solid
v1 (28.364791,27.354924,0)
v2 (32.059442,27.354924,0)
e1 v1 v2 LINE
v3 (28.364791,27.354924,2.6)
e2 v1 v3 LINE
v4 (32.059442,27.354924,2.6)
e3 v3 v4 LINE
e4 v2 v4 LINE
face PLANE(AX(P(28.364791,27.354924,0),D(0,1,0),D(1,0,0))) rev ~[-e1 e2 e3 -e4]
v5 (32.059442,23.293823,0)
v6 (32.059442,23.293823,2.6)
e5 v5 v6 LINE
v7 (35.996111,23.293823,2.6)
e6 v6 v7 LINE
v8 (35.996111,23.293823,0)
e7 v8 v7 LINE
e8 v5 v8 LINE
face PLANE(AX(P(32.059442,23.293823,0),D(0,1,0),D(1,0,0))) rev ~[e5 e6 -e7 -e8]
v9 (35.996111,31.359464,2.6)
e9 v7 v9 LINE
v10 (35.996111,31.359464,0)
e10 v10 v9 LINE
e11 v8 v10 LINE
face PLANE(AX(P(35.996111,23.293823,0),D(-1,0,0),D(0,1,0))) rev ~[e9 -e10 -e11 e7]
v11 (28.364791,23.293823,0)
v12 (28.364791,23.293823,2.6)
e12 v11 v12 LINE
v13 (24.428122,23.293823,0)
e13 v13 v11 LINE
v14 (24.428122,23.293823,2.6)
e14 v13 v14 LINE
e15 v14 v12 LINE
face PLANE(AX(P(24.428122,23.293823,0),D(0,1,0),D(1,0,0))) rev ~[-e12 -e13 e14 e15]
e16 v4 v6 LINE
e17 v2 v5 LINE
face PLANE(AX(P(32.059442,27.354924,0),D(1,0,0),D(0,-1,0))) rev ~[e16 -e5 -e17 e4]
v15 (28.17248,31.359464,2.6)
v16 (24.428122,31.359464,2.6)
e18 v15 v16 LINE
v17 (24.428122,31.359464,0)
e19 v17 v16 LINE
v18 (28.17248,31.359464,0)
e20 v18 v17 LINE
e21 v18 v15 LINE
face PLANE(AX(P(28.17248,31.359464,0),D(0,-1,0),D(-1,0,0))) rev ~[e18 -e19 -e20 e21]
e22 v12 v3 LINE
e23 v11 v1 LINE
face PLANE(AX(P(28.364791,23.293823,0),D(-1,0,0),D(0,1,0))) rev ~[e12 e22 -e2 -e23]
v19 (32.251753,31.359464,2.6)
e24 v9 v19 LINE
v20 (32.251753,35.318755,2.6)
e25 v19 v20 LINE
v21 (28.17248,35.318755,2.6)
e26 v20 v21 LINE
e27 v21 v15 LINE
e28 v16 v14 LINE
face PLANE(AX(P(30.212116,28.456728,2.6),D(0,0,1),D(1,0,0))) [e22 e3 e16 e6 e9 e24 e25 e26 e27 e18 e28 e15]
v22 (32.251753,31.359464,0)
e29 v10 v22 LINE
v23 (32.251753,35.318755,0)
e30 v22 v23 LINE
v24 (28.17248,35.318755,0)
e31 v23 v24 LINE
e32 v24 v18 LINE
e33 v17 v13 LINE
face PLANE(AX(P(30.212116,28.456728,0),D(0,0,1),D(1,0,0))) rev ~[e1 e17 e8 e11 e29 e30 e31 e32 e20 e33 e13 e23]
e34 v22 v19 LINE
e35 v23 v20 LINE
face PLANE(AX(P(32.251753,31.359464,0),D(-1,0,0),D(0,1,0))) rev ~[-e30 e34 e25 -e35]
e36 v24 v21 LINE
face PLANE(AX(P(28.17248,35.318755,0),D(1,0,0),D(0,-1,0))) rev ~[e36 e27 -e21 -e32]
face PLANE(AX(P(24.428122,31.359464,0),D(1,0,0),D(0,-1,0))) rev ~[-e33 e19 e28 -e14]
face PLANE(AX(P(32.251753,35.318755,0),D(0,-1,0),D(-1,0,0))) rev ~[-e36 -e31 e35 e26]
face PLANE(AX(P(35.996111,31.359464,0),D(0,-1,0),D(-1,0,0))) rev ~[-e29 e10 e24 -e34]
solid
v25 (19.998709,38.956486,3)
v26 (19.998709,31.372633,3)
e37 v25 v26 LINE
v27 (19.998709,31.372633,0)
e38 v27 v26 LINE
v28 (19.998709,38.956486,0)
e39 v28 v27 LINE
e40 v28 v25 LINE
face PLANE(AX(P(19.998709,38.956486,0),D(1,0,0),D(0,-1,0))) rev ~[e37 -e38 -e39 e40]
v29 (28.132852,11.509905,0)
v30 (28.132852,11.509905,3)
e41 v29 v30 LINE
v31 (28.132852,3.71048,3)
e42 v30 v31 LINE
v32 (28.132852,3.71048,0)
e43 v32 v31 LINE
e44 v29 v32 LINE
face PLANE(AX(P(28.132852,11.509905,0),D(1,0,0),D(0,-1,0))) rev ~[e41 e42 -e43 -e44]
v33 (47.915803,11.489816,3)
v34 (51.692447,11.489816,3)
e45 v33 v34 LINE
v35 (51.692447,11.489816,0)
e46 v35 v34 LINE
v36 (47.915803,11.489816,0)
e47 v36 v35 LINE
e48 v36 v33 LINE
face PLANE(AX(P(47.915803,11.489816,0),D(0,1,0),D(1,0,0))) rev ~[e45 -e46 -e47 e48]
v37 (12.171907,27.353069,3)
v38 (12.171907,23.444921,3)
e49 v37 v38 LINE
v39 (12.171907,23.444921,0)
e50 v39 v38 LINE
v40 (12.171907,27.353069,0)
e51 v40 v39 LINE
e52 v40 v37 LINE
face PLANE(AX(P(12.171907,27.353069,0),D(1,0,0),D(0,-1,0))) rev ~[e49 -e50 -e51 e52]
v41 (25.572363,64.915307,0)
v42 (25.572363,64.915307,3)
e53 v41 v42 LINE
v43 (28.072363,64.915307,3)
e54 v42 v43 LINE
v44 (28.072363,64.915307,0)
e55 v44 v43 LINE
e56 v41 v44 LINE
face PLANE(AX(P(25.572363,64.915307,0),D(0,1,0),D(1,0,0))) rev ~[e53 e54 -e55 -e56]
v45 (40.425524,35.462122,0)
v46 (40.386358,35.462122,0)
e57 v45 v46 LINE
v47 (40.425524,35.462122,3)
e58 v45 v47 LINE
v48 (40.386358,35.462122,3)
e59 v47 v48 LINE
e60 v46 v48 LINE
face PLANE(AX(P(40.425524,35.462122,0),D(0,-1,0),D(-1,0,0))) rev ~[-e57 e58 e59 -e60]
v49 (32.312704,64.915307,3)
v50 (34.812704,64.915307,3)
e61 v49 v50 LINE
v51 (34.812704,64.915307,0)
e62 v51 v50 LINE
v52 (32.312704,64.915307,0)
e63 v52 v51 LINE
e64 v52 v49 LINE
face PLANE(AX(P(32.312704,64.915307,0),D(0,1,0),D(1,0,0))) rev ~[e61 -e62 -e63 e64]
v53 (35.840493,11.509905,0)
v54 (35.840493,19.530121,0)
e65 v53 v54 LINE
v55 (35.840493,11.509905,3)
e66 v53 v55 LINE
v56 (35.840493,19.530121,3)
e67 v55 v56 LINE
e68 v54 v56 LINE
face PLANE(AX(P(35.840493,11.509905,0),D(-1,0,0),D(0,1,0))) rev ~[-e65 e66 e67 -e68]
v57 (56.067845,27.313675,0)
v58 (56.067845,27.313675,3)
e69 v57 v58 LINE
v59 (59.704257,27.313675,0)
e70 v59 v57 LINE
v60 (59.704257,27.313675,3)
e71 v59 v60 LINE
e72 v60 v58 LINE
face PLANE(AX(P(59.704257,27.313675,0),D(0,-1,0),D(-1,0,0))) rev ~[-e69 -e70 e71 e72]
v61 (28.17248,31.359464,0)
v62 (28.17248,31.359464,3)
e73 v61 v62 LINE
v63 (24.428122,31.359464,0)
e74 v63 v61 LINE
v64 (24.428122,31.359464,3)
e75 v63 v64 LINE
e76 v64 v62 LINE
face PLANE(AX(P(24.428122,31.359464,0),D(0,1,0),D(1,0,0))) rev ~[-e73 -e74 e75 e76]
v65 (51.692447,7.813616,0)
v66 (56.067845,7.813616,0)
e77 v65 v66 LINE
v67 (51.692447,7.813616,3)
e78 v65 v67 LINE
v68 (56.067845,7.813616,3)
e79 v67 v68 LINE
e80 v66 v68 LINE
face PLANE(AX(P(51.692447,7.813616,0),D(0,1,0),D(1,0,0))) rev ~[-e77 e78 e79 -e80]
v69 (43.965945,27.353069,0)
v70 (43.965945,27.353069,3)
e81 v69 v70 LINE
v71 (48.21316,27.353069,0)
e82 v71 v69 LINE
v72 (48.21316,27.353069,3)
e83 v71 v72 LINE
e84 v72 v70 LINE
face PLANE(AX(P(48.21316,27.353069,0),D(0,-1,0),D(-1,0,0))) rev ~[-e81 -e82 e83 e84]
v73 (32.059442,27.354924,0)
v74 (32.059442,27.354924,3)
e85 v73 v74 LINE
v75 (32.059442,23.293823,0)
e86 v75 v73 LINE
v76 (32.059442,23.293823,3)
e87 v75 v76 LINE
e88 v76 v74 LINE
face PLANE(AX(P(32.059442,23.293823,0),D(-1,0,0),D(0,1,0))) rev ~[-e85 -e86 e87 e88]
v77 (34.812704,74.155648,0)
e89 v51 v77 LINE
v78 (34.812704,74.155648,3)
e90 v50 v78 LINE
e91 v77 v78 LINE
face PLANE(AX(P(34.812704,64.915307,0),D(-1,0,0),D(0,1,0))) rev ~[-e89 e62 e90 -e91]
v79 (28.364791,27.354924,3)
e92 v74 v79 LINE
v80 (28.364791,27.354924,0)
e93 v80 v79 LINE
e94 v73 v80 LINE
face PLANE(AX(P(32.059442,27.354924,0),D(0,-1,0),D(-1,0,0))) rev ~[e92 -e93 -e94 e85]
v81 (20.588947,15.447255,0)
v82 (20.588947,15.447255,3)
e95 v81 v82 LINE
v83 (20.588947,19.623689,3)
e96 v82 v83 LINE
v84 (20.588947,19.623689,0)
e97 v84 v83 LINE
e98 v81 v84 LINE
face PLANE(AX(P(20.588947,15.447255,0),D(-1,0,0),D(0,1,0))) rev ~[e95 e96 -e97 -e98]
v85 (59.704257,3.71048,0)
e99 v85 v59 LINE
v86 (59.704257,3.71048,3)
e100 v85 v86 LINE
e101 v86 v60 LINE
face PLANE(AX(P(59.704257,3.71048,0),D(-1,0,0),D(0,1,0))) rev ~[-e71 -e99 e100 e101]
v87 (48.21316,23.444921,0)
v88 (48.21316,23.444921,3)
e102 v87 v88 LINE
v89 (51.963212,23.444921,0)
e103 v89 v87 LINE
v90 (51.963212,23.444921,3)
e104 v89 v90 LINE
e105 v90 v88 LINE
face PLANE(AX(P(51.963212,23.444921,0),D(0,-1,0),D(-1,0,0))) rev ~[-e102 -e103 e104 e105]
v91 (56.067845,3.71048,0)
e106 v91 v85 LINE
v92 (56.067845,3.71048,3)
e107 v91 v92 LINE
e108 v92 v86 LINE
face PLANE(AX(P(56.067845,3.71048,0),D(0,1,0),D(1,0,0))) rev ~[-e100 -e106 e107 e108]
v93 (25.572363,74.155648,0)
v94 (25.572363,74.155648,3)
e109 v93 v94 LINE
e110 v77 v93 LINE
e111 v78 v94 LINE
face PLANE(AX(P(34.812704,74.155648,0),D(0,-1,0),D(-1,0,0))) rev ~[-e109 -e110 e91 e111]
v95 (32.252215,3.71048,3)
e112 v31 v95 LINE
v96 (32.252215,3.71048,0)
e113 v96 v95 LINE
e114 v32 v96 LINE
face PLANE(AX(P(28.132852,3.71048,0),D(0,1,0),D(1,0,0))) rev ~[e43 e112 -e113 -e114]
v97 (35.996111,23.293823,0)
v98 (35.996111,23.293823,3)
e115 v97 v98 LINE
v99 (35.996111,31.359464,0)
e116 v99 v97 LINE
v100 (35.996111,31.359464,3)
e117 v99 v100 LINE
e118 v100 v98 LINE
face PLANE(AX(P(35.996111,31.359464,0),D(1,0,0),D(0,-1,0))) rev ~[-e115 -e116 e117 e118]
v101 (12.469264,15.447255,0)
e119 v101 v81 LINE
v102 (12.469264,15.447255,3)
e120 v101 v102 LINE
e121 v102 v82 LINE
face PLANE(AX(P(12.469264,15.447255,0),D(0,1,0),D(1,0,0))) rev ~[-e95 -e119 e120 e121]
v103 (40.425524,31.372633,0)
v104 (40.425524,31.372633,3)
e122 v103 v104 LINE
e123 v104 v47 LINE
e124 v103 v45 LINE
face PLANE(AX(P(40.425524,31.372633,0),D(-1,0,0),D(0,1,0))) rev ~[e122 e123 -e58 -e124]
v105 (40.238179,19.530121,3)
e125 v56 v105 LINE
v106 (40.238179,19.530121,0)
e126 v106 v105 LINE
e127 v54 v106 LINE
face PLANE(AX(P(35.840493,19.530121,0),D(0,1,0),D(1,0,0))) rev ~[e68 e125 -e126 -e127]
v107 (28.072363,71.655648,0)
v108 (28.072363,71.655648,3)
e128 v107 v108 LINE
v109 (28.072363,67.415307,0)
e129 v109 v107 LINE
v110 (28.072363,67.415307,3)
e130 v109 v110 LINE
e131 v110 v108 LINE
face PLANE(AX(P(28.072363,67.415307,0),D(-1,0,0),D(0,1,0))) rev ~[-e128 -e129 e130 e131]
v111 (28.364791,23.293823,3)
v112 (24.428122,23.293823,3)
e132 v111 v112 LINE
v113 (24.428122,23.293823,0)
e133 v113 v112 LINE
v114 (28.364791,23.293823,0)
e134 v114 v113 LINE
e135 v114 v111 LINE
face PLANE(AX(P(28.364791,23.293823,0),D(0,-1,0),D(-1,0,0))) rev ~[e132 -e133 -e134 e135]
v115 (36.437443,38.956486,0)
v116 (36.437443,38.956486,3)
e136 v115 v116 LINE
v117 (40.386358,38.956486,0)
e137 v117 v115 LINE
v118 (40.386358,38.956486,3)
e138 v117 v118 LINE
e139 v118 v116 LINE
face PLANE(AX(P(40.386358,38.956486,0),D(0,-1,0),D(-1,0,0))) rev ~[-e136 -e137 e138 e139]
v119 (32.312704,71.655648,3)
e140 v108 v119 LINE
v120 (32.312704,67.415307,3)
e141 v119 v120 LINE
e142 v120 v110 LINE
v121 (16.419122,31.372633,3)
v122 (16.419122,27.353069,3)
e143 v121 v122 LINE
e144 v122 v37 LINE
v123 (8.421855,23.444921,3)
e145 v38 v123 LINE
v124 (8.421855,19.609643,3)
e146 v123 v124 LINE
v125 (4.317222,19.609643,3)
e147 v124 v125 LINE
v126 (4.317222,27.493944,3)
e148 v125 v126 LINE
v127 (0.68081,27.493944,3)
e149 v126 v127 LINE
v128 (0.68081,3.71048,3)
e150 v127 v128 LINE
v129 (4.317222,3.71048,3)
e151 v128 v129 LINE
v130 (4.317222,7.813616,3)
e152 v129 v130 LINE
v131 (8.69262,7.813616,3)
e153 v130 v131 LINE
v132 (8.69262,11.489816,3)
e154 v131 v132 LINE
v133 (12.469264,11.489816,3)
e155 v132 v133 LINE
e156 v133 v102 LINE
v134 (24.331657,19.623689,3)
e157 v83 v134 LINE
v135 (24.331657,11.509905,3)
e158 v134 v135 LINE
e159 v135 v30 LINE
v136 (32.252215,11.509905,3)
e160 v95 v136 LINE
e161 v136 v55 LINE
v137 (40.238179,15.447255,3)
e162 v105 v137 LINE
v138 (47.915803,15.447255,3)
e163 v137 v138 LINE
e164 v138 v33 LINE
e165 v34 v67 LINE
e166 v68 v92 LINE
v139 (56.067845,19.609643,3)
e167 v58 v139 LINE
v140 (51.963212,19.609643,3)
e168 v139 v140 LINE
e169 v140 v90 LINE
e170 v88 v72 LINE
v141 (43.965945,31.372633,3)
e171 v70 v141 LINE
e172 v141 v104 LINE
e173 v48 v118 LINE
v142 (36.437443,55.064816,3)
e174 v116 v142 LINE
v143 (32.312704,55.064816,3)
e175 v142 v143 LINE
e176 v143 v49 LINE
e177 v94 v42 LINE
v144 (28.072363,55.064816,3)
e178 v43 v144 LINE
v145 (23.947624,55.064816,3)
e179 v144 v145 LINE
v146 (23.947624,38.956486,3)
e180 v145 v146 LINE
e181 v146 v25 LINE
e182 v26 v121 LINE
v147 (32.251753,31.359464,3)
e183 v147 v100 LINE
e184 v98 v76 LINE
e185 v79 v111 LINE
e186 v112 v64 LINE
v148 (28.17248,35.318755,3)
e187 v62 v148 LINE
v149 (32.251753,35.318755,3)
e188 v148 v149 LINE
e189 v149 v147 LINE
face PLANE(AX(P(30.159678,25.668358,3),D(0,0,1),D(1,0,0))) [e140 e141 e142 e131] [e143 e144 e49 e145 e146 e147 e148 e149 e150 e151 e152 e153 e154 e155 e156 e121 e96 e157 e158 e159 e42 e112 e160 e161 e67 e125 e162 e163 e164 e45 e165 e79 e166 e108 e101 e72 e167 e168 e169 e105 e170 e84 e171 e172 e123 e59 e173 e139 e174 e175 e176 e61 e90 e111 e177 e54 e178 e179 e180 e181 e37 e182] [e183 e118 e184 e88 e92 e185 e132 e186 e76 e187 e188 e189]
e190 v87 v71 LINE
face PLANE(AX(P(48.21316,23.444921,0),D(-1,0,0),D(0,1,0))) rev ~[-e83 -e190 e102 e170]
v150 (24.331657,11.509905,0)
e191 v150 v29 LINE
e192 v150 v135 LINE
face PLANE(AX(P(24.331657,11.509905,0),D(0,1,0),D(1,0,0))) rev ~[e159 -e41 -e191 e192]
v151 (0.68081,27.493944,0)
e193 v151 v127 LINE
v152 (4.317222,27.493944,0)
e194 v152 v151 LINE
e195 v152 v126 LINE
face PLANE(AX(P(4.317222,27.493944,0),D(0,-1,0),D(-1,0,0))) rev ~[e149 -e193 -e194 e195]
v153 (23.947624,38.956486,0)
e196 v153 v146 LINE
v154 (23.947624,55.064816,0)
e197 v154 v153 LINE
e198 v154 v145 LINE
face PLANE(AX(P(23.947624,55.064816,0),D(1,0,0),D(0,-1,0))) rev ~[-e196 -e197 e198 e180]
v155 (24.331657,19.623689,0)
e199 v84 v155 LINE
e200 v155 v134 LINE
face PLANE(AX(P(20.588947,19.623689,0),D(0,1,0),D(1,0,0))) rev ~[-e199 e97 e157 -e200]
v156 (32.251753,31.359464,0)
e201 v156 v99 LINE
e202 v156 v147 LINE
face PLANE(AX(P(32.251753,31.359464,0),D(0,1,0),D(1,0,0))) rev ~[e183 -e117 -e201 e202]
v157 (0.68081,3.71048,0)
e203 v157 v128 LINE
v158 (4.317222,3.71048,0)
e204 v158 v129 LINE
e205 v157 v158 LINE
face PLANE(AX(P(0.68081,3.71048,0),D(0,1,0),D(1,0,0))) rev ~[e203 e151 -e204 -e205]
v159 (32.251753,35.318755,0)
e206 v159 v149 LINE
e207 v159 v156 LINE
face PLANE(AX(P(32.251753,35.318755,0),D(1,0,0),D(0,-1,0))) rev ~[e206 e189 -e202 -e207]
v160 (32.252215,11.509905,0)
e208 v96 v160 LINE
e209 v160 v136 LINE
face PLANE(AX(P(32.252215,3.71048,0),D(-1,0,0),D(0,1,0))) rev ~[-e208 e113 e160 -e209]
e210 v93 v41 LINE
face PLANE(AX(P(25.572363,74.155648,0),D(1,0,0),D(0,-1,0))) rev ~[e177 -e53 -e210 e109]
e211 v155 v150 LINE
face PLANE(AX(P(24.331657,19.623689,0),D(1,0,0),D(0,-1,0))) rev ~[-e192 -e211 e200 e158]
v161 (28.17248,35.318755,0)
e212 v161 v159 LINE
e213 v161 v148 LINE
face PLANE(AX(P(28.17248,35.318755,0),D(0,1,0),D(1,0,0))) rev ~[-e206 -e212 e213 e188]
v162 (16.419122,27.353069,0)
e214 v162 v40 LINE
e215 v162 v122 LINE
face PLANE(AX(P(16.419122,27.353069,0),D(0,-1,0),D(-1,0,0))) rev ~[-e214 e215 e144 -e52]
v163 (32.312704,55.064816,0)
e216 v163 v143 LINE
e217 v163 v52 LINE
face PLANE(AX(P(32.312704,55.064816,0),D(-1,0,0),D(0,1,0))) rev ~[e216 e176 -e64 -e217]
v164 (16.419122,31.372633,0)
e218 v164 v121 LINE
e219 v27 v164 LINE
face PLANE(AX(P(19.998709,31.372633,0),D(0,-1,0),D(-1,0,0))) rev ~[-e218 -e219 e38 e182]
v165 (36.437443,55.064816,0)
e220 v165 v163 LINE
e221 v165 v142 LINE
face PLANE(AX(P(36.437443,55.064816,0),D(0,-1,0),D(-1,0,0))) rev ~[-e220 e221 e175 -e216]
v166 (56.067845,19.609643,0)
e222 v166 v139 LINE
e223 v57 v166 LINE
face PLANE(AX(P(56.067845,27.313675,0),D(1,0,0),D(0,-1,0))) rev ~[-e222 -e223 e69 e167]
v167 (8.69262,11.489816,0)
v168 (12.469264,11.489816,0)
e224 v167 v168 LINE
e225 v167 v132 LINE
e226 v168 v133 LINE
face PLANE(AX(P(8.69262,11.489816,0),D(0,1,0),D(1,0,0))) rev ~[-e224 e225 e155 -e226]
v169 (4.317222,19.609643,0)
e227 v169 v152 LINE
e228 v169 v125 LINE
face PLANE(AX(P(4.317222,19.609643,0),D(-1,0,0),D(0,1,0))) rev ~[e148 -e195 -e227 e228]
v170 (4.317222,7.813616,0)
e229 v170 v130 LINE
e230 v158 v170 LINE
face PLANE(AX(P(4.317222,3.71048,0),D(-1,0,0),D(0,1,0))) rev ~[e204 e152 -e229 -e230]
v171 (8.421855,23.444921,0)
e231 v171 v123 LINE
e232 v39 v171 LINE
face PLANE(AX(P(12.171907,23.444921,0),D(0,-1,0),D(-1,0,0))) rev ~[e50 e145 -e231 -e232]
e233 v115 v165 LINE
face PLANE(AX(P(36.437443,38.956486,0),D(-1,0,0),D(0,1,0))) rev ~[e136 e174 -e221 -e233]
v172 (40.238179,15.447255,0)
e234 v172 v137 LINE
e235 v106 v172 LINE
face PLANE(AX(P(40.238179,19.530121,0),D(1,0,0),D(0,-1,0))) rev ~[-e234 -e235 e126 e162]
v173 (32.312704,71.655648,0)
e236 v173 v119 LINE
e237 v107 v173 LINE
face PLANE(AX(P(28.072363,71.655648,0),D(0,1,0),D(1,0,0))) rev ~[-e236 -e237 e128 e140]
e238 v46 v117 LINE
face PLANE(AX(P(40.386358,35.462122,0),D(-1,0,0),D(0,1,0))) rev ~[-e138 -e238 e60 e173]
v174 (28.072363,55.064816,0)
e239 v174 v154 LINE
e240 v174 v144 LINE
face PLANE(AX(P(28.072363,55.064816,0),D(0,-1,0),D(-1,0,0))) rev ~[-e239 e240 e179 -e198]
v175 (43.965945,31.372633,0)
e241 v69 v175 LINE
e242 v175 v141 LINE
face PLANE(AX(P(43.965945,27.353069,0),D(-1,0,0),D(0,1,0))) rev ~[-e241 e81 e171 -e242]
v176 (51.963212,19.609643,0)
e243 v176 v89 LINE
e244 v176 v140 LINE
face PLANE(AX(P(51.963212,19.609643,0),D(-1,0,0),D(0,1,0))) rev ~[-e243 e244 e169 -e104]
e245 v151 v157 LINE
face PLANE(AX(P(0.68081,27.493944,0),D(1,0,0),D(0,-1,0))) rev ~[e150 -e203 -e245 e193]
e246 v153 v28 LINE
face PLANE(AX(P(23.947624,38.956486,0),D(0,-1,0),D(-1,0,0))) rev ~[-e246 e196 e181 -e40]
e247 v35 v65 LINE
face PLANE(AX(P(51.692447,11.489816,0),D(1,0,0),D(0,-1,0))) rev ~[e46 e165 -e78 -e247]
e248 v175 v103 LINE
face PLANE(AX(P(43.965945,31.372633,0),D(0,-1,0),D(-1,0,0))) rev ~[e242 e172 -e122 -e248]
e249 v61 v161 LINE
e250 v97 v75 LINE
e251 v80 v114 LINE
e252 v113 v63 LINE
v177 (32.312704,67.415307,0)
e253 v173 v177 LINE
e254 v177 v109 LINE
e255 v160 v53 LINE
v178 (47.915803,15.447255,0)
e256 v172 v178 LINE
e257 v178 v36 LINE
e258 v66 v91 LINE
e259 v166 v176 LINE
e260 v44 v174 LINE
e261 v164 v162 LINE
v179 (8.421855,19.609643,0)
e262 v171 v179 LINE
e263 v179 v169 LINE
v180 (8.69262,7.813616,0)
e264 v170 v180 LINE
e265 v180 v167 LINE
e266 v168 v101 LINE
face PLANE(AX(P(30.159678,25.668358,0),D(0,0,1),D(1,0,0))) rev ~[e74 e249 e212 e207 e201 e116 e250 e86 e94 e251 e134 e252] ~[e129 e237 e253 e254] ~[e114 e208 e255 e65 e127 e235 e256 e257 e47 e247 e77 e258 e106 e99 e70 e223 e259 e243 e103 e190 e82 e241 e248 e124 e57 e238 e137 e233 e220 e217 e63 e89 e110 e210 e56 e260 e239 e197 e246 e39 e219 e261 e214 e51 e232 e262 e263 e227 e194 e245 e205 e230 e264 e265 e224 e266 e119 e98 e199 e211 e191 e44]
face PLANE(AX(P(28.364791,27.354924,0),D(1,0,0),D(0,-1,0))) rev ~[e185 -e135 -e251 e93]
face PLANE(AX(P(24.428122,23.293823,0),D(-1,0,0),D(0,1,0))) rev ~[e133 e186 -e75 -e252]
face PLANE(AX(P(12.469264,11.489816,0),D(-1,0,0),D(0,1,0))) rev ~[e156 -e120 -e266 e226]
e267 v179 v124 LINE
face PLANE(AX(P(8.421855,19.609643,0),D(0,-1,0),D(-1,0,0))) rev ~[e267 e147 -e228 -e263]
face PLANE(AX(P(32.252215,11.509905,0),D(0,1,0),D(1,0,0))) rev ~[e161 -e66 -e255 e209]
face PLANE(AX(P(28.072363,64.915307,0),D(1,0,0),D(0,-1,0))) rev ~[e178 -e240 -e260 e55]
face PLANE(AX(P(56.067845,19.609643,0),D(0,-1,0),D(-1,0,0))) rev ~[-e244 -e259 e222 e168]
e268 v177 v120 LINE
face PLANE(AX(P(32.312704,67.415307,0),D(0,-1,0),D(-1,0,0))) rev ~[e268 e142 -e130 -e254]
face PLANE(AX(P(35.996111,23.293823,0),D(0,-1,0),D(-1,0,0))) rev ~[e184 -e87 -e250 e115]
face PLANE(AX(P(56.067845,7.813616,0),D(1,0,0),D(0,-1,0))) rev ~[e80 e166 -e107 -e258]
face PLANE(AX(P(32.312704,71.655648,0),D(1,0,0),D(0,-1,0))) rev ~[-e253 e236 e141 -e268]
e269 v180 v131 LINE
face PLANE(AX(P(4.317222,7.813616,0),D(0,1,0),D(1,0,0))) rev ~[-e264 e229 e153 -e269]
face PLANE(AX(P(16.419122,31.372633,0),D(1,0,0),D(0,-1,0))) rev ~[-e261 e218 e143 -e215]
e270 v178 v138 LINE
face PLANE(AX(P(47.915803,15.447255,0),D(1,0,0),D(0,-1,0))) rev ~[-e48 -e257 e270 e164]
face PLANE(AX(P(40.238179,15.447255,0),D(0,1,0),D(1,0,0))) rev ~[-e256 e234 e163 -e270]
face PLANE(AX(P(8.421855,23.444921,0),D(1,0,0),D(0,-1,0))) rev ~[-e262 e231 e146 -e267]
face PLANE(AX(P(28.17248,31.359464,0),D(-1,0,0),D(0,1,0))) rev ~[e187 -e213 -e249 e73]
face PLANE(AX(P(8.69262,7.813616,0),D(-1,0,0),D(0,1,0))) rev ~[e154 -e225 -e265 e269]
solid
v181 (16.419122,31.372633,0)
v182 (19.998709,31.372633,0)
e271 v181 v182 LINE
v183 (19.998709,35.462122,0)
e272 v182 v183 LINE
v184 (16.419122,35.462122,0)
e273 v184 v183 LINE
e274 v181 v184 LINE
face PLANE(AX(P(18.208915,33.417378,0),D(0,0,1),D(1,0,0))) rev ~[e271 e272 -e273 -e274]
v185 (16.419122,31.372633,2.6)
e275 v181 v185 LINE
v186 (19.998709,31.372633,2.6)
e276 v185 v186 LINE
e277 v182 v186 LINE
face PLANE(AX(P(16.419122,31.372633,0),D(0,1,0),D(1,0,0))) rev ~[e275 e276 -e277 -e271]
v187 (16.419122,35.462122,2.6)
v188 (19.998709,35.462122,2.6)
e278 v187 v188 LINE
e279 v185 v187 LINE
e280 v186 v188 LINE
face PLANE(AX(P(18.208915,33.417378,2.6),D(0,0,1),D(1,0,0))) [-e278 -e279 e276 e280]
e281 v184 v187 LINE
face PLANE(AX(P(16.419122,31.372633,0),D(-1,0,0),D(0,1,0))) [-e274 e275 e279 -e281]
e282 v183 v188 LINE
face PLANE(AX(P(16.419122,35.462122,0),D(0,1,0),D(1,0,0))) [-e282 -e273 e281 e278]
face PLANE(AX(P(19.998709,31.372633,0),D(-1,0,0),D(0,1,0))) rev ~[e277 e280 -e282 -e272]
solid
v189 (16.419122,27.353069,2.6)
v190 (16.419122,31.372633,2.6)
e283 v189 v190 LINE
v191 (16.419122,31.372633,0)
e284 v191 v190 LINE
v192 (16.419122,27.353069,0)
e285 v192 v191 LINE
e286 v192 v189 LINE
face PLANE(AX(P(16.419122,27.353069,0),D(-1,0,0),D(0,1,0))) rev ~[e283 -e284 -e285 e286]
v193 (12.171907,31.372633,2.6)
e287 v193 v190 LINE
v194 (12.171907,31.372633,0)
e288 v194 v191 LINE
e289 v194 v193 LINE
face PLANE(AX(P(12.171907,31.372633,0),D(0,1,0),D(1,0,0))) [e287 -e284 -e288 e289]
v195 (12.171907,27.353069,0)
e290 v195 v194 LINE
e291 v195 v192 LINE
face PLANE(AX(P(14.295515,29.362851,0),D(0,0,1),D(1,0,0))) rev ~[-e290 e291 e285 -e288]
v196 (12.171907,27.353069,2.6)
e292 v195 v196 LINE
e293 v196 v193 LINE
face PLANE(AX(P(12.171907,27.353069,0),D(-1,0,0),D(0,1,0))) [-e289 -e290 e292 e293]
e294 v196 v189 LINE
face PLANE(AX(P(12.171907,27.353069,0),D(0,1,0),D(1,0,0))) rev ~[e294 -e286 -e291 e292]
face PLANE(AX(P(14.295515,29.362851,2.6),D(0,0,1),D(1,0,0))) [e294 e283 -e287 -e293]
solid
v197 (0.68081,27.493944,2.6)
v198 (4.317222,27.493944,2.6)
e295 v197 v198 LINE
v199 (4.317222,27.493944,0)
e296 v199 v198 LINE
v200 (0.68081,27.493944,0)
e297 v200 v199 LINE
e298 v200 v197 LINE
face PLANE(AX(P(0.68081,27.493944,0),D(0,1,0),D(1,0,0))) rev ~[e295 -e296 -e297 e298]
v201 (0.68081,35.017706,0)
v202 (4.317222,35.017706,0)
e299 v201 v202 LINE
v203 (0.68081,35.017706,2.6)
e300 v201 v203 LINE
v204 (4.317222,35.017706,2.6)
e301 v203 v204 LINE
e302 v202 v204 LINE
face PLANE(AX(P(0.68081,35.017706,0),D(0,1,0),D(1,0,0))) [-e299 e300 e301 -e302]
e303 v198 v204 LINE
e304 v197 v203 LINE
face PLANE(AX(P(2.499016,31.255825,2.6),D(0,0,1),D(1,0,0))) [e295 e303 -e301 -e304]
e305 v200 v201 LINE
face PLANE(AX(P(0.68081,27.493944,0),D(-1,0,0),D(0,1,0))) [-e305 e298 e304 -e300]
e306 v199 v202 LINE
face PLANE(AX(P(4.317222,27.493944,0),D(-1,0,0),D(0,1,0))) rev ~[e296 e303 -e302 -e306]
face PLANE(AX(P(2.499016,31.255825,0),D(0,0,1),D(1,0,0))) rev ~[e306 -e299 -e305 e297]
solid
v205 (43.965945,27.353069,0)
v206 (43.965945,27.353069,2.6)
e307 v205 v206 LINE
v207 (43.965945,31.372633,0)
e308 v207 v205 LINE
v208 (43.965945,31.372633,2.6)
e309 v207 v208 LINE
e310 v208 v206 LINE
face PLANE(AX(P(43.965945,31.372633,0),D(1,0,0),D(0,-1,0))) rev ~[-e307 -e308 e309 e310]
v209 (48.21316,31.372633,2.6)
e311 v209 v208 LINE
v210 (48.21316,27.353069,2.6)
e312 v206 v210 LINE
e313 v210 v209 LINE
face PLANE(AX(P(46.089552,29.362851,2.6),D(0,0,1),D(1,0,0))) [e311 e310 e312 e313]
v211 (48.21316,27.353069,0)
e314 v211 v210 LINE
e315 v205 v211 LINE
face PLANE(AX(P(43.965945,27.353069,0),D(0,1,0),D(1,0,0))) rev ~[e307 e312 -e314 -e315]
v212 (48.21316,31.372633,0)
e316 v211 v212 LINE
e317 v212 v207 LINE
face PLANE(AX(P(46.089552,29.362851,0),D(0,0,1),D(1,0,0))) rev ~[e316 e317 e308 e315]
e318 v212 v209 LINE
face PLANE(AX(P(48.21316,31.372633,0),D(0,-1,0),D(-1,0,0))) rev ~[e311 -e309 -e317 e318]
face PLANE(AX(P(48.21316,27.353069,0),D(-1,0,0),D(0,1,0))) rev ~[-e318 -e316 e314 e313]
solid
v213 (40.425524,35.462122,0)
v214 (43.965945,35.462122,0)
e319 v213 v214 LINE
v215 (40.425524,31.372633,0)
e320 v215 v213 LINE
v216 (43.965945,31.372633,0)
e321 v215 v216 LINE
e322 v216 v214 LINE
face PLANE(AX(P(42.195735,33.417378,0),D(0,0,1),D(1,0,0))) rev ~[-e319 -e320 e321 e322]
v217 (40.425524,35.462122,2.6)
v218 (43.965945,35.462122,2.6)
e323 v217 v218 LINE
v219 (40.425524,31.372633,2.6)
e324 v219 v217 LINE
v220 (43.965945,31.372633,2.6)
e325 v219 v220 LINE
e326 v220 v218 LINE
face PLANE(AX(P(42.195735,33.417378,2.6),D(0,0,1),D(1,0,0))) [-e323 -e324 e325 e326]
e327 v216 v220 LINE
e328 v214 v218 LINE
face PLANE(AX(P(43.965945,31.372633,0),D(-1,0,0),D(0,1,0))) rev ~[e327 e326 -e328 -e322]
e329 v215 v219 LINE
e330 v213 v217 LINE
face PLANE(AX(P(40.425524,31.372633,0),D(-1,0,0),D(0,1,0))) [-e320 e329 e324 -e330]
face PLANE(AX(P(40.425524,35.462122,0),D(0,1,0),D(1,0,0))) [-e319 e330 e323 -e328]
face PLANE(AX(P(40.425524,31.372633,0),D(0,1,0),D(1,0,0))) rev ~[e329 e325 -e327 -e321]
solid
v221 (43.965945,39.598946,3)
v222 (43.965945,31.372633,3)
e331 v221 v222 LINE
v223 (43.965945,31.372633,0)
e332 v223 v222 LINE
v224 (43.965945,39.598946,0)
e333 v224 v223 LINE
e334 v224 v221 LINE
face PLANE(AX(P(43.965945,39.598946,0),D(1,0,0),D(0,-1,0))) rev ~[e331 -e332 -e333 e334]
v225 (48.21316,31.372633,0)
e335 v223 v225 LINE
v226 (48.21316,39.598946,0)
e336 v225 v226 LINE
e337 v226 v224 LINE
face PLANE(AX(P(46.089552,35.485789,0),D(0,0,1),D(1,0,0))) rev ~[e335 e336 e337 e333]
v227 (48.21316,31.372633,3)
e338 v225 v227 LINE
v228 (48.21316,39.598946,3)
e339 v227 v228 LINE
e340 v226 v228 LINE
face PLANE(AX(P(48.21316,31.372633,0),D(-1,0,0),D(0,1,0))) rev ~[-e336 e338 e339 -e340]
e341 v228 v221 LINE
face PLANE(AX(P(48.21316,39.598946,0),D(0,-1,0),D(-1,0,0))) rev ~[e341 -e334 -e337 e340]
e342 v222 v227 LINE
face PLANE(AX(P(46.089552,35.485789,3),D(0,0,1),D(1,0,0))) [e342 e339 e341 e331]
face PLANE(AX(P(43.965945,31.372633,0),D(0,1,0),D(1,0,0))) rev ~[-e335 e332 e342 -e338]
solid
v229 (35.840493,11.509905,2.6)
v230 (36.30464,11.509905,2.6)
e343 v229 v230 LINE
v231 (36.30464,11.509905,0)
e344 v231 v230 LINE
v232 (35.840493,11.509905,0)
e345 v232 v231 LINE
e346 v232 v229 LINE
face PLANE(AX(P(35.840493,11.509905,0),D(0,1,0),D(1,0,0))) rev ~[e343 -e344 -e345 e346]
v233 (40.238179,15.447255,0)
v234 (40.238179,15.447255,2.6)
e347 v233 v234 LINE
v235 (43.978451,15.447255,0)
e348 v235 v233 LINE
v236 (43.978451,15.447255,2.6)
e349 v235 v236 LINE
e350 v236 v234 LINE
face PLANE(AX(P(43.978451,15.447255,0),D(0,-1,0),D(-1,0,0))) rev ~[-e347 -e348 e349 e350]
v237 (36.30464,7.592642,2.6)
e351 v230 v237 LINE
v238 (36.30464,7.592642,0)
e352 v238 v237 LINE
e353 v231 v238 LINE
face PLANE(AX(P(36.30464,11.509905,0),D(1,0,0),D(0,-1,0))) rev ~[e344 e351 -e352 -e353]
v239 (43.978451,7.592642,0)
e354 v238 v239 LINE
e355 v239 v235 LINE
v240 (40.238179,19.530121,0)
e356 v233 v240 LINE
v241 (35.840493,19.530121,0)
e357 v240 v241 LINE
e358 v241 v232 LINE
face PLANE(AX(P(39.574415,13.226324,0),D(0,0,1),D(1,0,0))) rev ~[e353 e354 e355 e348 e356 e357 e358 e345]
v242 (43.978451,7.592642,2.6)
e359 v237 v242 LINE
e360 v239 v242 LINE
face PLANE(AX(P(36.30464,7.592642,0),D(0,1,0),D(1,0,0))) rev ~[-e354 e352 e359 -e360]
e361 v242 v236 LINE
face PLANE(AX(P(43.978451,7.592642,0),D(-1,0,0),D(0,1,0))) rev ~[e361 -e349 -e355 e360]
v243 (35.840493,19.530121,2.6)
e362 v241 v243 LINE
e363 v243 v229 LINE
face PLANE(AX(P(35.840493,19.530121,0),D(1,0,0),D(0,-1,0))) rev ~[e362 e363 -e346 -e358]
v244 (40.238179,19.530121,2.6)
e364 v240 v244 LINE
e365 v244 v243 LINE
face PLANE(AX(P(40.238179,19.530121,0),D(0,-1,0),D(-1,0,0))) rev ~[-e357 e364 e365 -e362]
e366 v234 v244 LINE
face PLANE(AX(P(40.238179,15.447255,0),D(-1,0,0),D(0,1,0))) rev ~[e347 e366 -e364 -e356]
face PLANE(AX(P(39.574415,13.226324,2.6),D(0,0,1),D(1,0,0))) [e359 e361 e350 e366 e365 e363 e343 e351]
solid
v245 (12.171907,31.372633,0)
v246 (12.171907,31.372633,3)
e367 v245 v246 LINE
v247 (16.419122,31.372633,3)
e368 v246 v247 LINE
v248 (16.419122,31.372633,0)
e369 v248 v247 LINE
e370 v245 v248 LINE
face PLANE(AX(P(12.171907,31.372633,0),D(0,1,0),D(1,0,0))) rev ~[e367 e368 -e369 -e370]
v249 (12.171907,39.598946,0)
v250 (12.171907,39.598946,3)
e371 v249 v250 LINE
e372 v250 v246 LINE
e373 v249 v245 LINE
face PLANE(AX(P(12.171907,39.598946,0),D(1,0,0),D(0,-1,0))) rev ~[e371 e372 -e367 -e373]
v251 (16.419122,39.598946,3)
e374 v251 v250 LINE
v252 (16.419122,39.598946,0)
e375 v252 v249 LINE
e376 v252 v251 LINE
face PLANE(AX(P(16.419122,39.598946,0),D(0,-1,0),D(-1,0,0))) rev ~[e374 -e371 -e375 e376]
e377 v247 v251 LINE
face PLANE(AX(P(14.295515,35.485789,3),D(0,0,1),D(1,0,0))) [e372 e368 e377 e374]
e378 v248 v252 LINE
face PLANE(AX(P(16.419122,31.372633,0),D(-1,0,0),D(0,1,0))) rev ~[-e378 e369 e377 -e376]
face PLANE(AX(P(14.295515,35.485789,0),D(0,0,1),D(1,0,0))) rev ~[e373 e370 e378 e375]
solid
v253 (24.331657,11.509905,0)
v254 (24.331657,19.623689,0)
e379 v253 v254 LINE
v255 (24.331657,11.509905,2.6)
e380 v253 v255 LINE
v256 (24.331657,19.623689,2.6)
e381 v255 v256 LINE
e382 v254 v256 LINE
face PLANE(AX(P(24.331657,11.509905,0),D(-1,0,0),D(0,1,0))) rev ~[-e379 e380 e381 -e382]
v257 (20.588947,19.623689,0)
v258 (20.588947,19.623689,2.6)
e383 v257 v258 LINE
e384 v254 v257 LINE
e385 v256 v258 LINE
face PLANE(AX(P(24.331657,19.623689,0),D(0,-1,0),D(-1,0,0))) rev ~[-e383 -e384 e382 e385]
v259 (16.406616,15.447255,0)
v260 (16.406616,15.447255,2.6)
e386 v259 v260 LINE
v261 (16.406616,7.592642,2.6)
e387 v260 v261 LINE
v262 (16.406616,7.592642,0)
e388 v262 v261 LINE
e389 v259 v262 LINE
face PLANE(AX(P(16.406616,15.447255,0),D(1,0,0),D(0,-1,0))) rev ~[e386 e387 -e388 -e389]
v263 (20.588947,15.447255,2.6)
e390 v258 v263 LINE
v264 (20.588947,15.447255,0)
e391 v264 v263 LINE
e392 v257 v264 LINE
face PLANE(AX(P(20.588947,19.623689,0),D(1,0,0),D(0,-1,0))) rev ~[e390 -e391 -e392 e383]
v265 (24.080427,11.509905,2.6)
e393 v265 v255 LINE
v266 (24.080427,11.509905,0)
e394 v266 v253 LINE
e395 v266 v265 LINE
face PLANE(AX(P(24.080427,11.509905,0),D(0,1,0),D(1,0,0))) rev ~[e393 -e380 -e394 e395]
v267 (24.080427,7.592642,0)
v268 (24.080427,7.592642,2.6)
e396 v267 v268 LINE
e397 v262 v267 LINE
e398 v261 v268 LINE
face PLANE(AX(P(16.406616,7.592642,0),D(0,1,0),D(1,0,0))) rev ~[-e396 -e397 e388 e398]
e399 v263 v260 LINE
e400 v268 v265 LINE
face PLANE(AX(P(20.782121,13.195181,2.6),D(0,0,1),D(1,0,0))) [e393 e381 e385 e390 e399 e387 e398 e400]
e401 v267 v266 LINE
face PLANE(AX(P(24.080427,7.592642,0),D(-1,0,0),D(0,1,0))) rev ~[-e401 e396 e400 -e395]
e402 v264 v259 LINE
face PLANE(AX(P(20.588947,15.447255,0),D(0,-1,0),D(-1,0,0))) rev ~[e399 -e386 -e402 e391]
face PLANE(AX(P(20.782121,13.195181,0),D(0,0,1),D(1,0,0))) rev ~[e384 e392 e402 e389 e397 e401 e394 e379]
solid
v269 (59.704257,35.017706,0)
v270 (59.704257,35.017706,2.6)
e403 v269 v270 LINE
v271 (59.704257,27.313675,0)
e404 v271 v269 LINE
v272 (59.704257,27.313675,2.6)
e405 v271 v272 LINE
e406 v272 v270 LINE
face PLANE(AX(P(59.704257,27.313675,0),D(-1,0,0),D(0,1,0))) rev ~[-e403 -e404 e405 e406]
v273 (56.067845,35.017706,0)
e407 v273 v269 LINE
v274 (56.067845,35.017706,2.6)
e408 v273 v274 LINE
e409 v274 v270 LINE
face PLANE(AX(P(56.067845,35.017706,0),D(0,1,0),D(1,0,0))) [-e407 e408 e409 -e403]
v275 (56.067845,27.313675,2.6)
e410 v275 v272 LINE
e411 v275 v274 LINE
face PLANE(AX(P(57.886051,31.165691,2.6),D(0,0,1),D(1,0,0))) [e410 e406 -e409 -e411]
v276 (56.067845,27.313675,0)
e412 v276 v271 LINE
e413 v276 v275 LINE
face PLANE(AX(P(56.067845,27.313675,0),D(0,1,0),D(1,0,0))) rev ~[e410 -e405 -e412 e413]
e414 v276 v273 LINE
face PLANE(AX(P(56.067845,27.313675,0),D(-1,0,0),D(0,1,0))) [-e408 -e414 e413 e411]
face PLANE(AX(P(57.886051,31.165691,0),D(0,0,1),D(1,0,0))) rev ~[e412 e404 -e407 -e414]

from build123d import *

# Parameters (mm, degrees)
F1_DEPTH = 3
F0_W     = 3.6364123225
F0_H     = 7.5237620622
F2_DEPTH = 2.6
F0_W_2   = 3.5404209048
F0_H_2   = 4.0894895792
F0_H_3   = 7.7040316537
F0_W_3   = 4.2472146451
F0_H_4   = 4.0195640177
F0_W_4   = 3.5795867443


# Not quite as in the source:
# - a feature names something its author has since deleted; it is built from what else it names


with BuildPart() as f1:
    # F0 (on Top) → F1 (new body)
    with BuildSketch(Plane.XY):
        Polygon((32.3127042502, 67.4153068662), (30.1925335079, 67.4153068662), (28.0723627657, 67.4153068662), (28.0723627657, 64.9153068662), (28.0723627657, 55.0648160279), (23.9476244897, 55.0648160279), (23.9476244897, 38.9564856887), (19.9987087399, 38.9564856887), (19.9987087399, 35.4621224105), (19.9987087399, 31.3726328313), (16.4191219956, 31.3726328313), (16.4191219956, 27.3530688137), (12.1719073504, 27.3530688137), (12.1719073504, 23.4449207783), (8.4218550473, 23.4449207783), (8.4218550473, 19.6096431464), (4.3172221631, 19.6096431464), (4.3172221631, 27.4939443916), (0.6808098406, 27.4939443916), (0.6808098406, 3.7104797084), (4.3172221631, 3.7104797084), (4.3172221631, 7.8136157244), (8.6926203221, 7.8136157244), (8.6926203221, 11.48981601), (12.4692637473, 11.48981601), (12.4692637473, 15.447255224), (16.406616196, 15.447255224), (20.5889474601, 15.447255224), (20.5889474601, 19.6236893535), (24.331657216, 19.6236893535), (24.331657216, 11.5099046379), (28.1328521669, 11.5099046379), (28.1328521669, 3.7104797084), (29.953636229, 3.7104797084), (30.4314307868, 3.7104797084), (32.252214849, 3.7104797084), (32.252214849, 11.5099046379), (35.8404926956, 11.5099046379), (35.8404926956, 19.530121237), (40.2381792665, 19.530121237), (40.2381792665, 15.447255224), (43.9784508198, 15.447255224), (47.9158032686, 15.447255224), (47.9158032686, 11.48981601), (51.6924466938, 11.48981601), (51.6924466938, 7.8136157244), (56.0678448528, 7.8136157244), (56.0678448528, 3.7104797084), (59.7042571753, 3.7104797084), (59.7042571753, 27.3136748001), (56.0678448528, 27.3136748001), (56.0678448528, 19.6096431464), (51.9632119685, 19.6096431464), (51.9632119685, 23.4449207783), (48.2131596655, 23.4449207783), (48.2131596655, 27.3530688137), (44.0051108599, 27.3530688137), (43.9659450203, 27.3530688137), (43.9659450203, 31.3726328313), (40.4255241156, 31.3726328313), (40.4255241156, 35.4621224105), (40.386358276, 35.4621224105), (40.386358276, 38.9564856887), (36.4374425262, 38.9564856887), (36.4374425262, 55.0648160279), (32.3127042502, 55.0648160279), (32.3127042502, 64.9153068662), align=None)
        Polygon((28.1724799424, 31.3594639301), (28.1724799424, 35.3187546134), (32.251752913, 35.3187546134), (32.251752913, 31.3594639301), (35.9961111099, 31.3594639301), (35.9961111099, 23.2938230038), (32.0594422519, 23.2938230038), (32.0594422519, 27.3549240083), (28.3647906035, 27.3549240083), (28.3647906035, 23.2938230038), (24.4281217456, 23.2938230038), (24.4281217456, 31.3594639301), align=None, mode=Mode.SUBTRACT)
        Polygon((32.3127042502, 71.6556483507), (32.3127042502, 67.4153068662), (32.3127042502, 64.9153068662), (34.8127042502, 64.9153068662), (34.8127042502, 74.1556483507), (25.5723627657, 74.1556483507), (25.5723627657, 64.9153068662), (28.0723627657, 64.9153068662), (28.0723627657, 67.4153068662), (28.0723627657, 71.6556483507), align=None)
    extrude(amount=F1_DEPTH)


with BuildPart() as f1b:
    # F0 (on Top) → F1, piece 2 (new body)
    with BuildSketch(Plane.XY):
        Polygon((43.9659450203, 39.5989455283), (43.9659450203, 35.4621224105), (43.9659450203, 31.3726328313), (44.0051108599, 31.3726328313), (48.2131596655, 31.3726328313), (48.2131596655, 39.5989455283), (44.0051108599, 39.5989455283), align=None)
    extrude(amount=F1_DEPTH)


with BuildPart() as f1c:
    # F0 (on Top) → F1, piece 3 (new body)
    with BuildSketch(Plane.XY):
        Polygon((16.4191219956, 31.3726328313), (16.4191219956, 35.4621224105), (16.4191219956, 39.5989455283), (12.1719073504, 39.5989455283), (12.1719073504, 31.3726328313), align=None)
    extrude(amount=F1_DEPTH)


with BuildPart() as f2:
    # F0 (on Top) → F2 (new body)
    with BuildSketch(Plane.XY):
        with Locations((2.4990160018, 31.2558254227)):
            Rectangle(F0_W, F0_H)
    extrude(amount=F2_DEPTH)


with BuildPart() as f2b:
    # F0 (on Top) → F2, piece 2 (new body)
    with BuildSketch(Plane.XY):
        Polygon((32.251752913, 35.3187546134), (28.1724799424, 35.3187546134), (28.1724799424, 31.3594639301), (24.4281217456, 31.3594639301), (24.4281217456, 23.2938230038), (28.3647906035, 23.2938230038), (28.3647906035, 27.3549240083), (32.0594422519, 27.3549240083), (32.0594422519, 23.2938230038), (35.9961111099, 23.2938230038), (35.9961111099, 31.3594639301), (32.251752913, 31.3594639301), align=None)
    extrude(amount=F2_DEPTH)


with BuildPart() as f2c:
    # F0 (on Top) → F2, piece 3 (new body)
    with BuildSketch(Plane.XY):
        with Locations((42.1957345679, 33.4173776209)):
            Rectangle(F0_W_2, F0_H_2)
    extrude(amount=F2_DEPTH)


with BuildPart() as f2d:
    # F0 (on Top) → F2, piece 4 (new body)
    with BuildSketch(Plane.XY):
        with Locations((57.8860510141, 31.1656906269)):
            Rectangle(F0_W, F0_H_3)
    extrude(amount=F2_DEPTH)


with BuildPart() as f2e:
    # F0 (on Top) → F2, piece 5 (new body)
    with BuildSketch(Plane.XY):
        Polygon((43.9784508198, 7.5926417485), (43.9784508198, 15.447255224), (40.2381792665, 15.447255224), (40.2381792665, 19.530121237), (35.8404926956, 19.530121237), (35.8404926956, 11.5099046379), (36.3046396524, 11.5099046379), (36.3046396524, 7.5926417485), align=None)
    extrude(amount=F2_DEPTH)


with BuildPart() as f2f:
    # F0 (on Top) → F2, piece 6 (new body)
    with BuildSketch(Plane.XY):
        Polygon((20.5889474601, 15.447255224), (16.406616196, 15.447255224), (16.406616196, 7.5926417485), (24.0804273635, 7.5926417485), (24.0804273635, 11.5099046379), (24.331657216, 11.5099046379), (24.331657216, 19.6236893535), (20.5889474601, 19.6236893535), align=None)
    extrude(amount=F2_DEPTH)


with BuildPart() as f2g:
    # F0 (on Top) → F2, piece 7 (new body)
    with BuildSketch(Plane.XY):
        with Locations((14.295514673, 29.3628508225)):
            Rectangle(F0_W_3, F0_H_4)
    extrude(amount=F2_DEPTH)


with BuildPart() as f2h:
    # F0 (on Top) → F2, piece 8 (new body)
    with BuildSketch(Plane.XY):
        with Locations((18.2089153677, 33.4173776209)):
            Rectangle(F0_W_4, F0_H_2)
    extrude(amount=F2_DEPTH)


with BuildPart() as f2i:
    # F0 (on Top) → F2, piece 9 (new body)
    with BuildSketch(Plane.XY):
        Polygon((44.0051108599, 31.3726328313), (43.9659450203, 31.3726328313), (43.9659450203, 27.3530688137), (44.0051108599, 27.3530688137), (48.2131596655, 27.3530688137), (48.2131596655, 31.3726328313), align=None)
    extrude(amount=F2_DEPTH)


solid = Compound([f1.part, f1b.part, f1c.part, f2.part, f2b.part, f2c.part, f2d.part, f2e.part, f2f.part, f2g.part, f2h.part, f2i.part])
